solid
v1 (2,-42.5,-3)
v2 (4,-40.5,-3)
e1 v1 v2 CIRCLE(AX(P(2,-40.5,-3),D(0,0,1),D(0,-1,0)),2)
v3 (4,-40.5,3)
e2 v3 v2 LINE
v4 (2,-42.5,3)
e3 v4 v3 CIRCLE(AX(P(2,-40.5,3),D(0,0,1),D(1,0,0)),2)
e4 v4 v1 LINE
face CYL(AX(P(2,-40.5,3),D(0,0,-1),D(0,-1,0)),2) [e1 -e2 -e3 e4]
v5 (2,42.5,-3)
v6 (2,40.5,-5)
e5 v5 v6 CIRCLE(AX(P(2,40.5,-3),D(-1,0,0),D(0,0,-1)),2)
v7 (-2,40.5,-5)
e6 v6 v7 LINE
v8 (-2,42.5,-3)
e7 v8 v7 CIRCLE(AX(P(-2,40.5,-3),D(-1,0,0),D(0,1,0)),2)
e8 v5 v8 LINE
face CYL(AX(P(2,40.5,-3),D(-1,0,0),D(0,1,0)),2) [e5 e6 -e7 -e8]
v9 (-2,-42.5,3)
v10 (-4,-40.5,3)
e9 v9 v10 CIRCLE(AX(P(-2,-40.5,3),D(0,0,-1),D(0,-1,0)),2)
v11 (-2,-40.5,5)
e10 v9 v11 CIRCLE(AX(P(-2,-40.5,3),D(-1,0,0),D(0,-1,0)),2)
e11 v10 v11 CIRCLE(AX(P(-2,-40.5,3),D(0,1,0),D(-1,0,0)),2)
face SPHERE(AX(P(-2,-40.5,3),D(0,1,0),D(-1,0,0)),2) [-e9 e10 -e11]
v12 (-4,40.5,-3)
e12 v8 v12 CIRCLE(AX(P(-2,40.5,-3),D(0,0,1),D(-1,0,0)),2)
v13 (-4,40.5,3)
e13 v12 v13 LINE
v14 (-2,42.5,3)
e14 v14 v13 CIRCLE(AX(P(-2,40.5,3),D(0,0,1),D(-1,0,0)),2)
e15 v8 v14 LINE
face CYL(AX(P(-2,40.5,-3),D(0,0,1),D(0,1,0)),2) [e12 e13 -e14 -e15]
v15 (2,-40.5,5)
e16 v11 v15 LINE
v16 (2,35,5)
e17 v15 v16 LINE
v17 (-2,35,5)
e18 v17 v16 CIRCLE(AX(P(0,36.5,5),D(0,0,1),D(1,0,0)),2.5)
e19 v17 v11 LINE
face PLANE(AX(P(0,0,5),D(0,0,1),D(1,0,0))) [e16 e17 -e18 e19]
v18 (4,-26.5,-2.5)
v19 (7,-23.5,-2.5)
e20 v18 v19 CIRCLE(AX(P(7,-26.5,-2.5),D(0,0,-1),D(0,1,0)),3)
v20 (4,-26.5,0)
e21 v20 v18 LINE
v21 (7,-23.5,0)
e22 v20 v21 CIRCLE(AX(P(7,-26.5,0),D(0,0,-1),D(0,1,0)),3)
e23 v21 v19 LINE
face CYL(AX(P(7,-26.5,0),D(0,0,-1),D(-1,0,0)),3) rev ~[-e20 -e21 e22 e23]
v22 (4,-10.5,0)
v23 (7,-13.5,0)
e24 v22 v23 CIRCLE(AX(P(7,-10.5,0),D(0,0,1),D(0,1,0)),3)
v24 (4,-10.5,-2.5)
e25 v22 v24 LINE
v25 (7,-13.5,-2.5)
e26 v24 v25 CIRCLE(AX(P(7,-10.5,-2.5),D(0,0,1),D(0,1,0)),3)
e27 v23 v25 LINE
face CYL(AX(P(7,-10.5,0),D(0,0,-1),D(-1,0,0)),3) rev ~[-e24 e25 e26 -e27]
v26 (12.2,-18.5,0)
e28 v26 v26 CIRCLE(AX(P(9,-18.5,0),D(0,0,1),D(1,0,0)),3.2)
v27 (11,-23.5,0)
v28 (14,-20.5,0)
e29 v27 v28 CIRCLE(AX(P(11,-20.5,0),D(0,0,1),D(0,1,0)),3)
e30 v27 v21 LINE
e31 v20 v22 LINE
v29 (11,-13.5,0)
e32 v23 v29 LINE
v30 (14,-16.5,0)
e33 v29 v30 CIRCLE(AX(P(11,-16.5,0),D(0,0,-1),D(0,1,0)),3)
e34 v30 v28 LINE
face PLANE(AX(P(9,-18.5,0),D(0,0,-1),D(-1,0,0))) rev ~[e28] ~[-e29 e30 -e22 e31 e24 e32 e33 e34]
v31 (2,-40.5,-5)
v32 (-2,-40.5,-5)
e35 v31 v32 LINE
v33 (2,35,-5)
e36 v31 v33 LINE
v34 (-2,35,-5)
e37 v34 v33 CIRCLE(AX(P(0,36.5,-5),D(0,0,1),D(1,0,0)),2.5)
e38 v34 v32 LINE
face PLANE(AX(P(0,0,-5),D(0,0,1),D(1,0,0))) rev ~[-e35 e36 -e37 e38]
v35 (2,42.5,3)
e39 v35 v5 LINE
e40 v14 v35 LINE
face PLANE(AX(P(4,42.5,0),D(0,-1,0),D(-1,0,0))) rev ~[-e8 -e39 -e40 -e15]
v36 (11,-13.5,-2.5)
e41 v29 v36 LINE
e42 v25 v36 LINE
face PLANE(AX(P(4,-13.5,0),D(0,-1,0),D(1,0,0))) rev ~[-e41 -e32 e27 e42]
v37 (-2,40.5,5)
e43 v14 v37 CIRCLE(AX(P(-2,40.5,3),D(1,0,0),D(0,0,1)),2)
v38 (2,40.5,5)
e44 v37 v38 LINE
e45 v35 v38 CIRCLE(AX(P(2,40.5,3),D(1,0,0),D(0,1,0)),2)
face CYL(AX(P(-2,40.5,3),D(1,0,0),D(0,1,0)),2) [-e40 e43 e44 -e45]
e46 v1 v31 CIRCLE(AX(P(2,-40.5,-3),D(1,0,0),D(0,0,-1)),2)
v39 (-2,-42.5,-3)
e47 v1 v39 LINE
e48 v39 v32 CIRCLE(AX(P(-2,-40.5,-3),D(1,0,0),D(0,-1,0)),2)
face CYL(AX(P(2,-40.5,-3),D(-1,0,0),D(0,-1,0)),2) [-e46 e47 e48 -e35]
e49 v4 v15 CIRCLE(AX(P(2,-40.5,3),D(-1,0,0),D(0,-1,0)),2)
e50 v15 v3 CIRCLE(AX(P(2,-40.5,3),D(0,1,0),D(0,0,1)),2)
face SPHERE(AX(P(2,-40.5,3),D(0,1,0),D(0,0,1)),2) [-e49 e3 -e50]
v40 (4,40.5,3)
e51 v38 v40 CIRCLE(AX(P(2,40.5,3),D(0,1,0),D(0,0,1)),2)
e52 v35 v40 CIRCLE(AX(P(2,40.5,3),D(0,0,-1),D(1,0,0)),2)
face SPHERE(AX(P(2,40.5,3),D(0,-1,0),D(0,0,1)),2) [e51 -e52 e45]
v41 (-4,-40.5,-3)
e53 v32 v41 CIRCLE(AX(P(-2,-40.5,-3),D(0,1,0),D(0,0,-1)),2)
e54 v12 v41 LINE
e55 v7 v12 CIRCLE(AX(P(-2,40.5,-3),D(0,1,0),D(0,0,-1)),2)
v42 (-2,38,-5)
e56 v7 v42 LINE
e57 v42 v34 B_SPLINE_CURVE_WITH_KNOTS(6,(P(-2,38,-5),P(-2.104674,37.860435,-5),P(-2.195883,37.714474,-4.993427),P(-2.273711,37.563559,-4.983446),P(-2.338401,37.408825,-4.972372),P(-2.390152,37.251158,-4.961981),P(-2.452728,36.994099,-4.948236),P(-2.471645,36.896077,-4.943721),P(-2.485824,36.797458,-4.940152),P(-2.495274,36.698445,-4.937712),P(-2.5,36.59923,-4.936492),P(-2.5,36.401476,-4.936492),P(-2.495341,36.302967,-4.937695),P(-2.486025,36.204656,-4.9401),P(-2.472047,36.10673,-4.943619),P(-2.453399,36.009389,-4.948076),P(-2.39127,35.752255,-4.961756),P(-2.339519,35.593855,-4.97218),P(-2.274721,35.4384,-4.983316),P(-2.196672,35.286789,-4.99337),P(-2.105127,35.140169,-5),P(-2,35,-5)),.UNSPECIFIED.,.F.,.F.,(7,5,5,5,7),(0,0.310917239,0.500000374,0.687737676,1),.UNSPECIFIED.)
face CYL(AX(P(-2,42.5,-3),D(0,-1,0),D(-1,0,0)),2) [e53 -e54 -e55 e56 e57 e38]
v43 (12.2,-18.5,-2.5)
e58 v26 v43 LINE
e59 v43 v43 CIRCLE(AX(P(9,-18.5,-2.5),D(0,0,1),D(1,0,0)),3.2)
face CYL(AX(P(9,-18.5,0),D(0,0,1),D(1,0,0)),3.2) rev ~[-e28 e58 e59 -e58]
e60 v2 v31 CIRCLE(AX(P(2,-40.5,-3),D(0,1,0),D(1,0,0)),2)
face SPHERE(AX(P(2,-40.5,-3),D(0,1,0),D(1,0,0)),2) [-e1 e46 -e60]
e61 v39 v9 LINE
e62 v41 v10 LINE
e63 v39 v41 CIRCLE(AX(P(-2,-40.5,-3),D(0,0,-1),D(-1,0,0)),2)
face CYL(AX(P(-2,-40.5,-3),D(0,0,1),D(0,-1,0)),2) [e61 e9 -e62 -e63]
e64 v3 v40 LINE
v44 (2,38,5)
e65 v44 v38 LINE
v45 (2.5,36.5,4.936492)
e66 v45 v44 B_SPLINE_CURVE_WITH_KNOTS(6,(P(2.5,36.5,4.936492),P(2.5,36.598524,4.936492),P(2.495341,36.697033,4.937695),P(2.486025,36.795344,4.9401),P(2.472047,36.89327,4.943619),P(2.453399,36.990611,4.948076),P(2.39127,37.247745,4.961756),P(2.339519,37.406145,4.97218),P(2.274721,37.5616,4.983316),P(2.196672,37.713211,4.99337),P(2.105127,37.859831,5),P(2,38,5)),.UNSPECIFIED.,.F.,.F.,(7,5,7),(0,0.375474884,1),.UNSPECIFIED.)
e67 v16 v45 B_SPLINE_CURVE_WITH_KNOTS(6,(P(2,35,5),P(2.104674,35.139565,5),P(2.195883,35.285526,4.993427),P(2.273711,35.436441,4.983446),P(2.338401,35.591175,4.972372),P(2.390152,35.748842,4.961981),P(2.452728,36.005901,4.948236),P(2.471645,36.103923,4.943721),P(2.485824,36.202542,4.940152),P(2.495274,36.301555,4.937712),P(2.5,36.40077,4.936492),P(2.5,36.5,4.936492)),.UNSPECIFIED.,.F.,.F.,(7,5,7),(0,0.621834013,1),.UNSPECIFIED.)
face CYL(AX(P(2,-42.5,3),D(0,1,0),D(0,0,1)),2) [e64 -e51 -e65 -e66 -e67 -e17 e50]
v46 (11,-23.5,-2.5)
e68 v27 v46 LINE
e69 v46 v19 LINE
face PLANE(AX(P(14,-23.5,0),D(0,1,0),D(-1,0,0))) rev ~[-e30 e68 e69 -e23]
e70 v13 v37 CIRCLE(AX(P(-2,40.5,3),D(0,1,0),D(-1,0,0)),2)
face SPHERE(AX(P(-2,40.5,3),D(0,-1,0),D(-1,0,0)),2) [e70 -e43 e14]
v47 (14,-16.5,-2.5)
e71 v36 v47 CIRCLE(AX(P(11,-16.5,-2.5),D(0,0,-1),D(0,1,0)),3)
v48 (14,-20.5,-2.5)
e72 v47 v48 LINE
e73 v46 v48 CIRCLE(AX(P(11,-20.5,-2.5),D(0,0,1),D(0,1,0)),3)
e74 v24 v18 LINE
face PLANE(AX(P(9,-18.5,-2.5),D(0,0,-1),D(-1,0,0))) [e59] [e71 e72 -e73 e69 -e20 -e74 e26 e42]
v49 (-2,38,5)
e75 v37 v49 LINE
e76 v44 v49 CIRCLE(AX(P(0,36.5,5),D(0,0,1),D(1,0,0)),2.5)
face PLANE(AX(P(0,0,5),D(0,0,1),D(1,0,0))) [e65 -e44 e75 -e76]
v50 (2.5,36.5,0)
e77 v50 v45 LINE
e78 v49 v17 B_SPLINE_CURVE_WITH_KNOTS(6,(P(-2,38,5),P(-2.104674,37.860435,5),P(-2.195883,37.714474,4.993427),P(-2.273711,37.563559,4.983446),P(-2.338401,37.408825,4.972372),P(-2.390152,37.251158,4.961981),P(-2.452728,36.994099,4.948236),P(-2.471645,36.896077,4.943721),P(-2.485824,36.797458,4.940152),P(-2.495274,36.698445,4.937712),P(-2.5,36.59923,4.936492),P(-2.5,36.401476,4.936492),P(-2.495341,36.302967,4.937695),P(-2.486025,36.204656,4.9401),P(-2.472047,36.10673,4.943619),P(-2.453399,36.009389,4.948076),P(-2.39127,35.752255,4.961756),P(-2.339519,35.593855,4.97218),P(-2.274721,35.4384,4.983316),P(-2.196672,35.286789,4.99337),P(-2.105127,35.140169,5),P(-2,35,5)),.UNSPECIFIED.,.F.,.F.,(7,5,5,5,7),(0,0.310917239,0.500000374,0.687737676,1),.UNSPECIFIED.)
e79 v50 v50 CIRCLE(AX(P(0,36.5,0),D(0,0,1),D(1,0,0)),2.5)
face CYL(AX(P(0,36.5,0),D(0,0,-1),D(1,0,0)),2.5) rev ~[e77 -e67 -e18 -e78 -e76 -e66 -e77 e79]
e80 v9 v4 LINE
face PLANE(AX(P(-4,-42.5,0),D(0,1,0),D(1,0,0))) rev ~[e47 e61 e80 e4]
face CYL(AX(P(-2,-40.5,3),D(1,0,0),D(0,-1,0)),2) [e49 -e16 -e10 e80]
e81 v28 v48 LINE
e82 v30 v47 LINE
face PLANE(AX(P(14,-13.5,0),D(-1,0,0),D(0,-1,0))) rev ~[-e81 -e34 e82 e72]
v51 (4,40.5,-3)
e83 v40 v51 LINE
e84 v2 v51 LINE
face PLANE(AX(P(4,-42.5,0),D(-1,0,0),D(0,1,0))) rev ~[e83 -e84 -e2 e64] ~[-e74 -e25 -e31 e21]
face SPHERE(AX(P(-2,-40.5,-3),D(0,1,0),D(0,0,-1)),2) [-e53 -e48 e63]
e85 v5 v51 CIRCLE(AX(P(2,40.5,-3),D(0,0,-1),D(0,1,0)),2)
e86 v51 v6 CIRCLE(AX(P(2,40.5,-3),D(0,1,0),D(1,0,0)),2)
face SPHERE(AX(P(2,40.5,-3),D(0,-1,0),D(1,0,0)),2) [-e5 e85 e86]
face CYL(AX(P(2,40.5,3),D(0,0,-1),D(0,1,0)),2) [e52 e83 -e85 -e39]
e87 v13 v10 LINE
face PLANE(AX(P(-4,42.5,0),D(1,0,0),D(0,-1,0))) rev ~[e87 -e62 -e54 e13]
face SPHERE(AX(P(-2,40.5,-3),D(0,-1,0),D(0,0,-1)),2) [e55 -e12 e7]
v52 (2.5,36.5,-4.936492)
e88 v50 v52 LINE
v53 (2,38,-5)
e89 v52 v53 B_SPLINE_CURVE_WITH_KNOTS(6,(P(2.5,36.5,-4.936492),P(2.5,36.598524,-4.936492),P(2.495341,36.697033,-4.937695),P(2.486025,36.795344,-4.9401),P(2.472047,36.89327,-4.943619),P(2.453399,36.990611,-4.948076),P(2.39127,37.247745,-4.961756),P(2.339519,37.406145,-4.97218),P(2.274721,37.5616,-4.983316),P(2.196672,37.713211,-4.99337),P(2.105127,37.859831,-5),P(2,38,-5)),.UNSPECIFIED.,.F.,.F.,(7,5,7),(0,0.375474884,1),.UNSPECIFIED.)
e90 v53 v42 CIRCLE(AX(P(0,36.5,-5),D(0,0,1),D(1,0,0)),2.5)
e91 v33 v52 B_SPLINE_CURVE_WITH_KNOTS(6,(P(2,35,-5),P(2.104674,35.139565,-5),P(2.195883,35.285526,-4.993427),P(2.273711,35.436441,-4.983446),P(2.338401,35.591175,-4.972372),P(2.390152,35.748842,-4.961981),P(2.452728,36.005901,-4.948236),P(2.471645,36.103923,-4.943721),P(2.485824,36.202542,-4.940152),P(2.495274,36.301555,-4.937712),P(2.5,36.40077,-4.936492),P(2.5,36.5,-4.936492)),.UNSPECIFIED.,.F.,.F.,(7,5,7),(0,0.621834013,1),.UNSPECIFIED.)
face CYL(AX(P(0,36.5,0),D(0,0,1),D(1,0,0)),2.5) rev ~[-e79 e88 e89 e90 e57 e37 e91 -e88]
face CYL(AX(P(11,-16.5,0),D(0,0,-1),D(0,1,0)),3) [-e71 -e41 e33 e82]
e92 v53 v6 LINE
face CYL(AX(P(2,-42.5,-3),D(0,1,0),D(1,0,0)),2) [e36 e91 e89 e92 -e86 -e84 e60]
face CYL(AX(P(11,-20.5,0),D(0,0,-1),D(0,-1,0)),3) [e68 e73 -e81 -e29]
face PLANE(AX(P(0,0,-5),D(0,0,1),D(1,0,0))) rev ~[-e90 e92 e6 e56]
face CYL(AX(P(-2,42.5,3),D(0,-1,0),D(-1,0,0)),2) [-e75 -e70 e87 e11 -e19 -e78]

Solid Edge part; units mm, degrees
sketch "Sketch1" plane through (0, 0, 0) normal (0, 0, 1) x (1, 0, 0)
  line L0 (-4, 42.5) -> (-4, -42.5)
  line L1 (-4, -42.5) -> (4, -42.5)
  line L2 (4, -42.5) -> (4, 42.5)
  line L3 (4, 42.5) -> (-4, 42.5)
extrude "Protrusion1" add sketch "Sketch1" along normal mid plane 10
fillet "Round_2" radius 2 4 edges at (-4, 0, 5) (4, 0, 5) (-4, 0, -5) (4, 0, -5)
fillet "Round_3" radius 2 14 edges at (-3.4142, 42.5, 4.4142) (0, 42.5, 5) (3.4142, 42.5, 4.4142) (4, 42.5, 0) (0, 42.5, -5) (-3.4142, 42.5, -4.4142) (-4, 42.5, 0) (0, -42.5, 5) (-3.4142, -42.5, 4.4142) (-4, -42.5, 0) (-3.4142, -42.5, -4.4142) (0, -42.5, -5) (3.4142, -42.5, -4.4142) (4, -42.5, 0)
sketch "Sketch2" plane through (0, 0, 0) normal (0, 0, 1) x (1, 0, 0)
  circle A0 centre (9, -18.5) radius 3.2
  line L0 (14, -13.5) -> (14, -23.5)
  line L1 (14, -23.5) -> (4, -23.5)
  line L2 (4, -23.5) -> (4, -13.5)
  line L3 (4, -13.5) -> (14, -13.5)
  dimension "D1" = 55
  dimension "D2" = 6.4
  dimension "D3" = 5
  dimension "D4" = 10
  dimension "D5" = 10
  dimension "D6" = 5
extrude "ExtrudedProtrusion_4" add sketch "Sketch2" against normal blind 2.5
fillet "Round_5" radius 3 4 edges at (14, -13.5, -1.25) (14, -23.5, -1.25) (4, -13.5, -1.25) (4, -23.5, -1.25)
sketch "Sketch3" plane through (0, 0, 0) normal (0, 0, 1) x (1, 0, 0)
  circle A0 centre (0, 36.5) radius 2.5
extrude "ExtrudedCutout_2" cut sketch "Sketch3" along normal mid plane 10
